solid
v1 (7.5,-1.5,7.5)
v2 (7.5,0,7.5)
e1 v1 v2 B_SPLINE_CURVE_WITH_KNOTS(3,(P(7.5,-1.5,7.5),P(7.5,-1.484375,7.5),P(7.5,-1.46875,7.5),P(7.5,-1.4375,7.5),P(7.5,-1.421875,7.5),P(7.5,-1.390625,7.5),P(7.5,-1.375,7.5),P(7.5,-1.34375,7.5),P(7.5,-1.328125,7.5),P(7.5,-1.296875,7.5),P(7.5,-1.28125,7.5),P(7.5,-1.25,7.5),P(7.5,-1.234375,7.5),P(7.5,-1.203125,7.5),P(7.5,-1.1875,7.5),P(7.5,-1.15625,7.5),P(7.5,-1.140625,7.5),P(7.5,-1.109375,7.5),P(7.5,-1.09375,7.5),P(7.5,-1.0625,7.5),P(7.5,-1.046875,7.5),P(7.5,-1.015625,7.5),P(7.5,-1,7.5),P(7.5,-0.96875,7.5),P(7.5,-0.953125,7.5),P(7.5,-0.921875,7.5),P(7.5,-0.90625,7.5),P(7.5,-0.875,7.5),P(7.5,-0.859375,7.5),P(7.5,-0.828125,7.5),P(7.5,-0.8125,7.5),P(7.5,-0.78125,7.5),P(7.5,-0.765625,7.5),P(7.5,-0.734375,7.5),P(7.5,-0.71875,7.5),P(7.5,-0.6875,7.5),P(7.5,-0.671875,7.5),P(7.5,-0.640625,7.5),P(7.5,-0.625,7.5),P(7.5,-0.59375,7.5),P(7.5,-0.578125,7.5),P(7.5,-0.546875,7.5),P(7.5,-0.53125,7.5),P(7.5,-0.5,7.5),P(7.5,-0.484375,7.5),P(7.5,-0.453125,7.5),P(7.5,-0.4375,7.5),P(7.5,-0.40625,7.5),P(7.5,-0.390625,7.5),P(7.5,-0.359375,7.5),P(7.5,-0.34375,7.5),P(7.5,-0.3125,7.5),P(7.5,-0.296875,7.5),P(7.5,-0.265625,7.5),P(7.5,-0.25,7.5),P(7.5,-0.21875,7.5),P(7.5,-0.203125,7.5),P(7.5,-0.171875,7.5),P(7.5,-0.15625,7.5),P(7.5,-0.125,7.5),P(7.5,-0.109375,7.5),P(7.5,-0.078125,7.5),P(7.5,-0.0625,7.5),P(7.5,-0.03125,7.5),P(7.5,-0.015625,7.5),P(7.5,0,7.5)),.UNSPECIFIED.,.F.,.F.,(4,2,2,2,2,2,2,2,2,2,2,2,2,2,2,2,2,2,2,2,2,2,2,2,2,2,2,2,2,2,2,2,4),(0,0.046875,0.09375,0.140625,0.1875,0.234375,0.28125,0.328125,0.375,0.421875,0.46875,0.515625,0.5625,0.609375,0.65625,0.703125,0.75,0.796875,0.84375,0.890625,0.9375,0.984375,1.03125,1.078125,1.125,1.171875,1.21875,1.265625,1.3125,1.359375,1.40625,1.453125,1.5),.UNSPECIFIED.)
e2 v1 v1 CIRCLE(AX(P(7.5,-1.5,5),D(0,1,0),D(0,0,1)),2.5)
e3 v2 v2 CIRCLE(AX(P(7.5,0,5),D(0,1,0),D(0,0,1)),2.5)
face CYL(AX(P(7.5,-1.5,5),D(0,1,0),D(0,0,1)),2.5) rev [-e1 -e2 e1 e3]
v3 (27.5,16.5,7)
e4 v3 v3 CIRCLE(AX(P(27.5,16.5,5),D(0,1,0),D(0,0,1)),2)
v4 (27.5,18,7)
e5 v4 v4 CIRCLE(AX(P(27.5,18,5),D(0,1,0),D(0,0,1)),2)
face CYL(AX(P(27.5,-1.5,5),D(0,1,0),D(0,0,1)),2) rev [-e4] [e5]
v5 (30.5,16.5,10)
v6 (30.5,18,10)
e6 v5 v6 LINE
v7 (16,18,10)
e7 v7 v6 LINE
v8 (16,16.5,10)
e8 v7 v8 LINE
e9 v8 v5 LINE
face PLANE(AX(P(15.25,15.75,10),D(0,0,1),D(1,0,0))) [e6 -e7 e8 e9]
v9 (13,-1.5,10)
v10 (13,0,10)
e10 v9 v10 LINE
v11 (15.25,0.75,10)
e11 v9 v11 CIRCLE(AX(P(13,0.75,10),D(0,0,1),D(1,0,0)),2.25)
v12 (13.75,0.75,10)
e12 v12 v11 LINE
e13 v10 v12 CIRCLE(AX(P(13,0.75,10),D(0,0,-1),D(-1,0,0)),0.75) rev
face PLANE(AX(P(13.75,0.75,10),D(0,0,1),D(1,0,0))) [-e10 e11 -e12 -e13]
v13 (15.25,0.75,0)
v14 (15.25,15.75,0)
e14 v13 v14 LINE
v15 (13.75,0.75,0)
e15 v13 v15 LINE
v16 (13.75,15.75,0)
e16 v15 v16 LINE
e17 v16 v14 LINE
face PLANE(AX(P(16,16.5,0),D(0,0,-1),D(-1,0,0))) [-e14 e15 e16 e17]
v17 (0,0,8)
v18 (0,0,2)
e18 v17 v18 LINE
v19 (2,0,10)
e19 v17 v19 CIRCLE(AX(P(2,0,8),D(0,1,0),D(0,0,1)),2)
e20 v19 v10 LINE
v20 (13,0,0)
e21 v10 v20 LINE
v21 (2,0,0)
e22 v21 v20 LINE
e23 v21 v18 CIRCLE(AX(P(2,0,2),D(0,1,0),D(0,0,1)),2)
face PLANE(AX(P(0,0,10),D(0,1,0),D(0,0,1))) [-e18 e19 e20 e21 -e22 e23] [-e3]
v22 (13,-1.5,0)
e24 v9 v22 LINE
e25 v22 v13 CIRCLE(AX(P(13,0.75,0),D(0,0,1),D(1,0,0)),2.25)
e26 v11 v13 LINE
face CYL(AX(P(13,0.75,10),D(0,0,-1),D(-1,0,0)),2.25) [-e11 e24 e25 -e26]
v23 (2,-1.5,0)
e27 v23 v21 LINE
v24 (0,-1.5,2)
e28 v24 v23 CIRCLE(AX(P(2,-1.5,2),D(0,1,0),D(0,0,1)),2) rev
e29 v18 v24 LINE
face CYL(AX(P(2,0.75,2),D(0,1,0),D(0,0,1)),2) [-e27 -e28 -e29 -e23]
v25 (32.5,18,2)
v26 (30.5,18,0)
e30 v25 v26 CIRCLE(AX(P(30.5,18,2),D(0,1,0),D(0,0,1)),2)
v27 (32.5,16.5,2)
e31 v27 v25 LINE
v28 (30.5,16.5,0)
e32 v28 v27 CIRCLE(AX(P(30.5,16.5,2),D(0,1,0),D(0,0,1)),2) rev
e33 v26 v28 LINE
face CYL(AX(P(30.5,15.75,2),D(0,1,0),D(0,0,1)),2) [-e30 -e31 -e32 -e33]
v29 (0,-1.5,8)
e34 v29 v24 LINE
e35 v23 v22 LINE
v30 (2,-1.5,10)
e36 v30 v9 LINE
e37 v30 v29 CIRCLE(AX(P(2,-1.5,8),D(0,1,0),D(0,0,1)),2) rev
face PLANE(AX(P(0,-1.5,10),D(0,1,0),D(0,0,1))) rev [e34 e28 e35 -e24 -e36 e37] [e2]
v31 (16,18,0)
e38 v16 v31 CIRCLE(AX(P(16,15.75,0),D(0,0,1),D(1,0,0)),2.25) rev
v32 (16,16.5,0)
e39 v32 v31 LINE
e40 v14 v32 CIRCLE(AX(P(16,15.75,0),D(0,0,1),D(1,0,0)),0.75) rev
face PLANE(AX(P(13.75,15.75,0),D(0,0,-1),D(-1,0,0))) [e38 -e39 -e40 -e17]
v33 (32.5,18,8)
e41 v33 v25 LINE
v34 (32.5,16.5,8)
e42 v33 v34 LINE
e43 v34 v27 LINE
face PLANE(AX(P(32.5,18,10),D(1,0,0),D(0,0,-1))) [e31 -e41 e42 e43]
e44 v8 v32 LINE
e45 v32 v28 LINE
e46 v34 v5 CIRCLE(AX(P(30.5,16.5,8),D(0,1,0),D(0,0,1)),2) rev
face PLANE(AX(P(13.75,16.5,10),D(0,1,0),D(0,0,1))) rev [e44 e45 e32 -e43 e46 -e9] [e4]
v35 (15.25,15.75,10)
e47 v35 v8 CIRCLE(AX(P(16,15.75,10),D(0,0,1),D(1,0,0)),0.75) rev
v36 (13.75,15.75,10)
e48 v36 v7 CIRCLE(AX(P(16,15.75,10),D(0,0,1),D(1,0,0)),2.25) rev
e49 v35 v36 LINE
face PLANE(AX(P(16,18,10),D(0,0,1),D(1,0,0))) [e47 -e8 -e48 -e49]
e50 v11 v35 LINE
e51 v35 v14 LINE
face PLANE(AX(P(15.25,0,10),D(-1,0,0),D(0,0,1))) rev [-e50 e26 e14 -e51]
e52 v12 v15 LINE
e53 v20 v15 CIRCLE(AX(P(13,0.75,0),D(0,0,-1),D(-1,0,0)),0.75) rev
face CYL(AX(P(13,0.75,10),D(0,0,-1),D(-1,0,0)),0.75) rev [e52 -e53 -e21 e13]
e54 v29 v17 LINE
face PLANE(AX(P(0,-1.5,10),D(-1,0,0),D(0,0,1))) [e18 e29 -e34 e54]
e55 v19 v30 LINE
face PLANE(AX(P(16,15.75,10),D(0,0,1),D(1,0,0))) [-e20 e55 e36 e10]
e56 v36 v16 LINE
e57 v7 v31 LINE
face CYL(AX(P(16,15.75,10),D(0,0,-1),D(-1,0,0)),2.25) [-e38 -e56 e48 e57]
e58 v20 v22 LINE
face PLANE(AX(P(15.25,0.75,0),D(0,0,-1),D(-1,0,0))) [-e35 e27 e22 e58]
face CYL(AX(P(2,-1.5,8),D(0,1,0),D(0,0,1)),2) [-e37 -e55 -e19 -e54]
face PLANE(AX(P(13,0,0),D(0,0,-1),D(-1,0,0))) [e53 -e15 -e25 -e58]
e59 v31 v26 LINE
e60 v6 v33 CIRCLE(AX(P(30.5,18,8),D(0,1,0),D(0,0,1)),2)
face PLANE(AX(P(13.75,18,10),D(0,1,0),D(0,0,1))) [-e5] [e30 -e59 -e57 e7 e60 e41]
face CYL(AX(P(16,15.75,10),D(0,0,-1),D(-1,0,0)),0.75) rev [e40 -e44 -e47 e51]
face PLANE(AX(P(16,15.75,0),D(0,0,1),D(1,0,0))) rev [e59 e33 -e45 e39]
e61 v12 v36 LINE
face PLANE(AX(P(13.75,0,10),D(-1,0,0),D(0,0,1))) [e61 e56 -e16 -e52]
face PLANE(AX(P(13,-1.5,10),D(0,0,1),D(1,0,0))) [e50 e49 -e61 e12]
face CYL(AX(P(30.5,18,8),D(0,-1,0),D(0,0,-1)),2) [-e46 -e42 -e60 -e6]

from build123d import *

# Parameters (mm, degrees)
BASE_FLANGE1_DEPTH = 10
SKETCH6_R          = 2.5
CUT_EXTRUDE1_DEPTH = 39.474017206
SKETCH7_R          = 2
CUT_EXTRUDE2_DEPTH = 40.198214245
FILLET1_R          = 2


# Sheet-metal steps are written as plain solids
with BuildPart() as part:
    # Sketch1 → Base-Flange1 (new body)
    with BuildSketch(Plane.XY):
        with BuildLine():
            Line((0, 0), (13, 0))
            ThreePointArc((13, 0), (13.530330086, 0.219669914), (13.75, 0.75))
            Line((13.75, 0.75), (13.75, 15.75))
            ThreePointArc((13.75, 15.75), (14.409009742, 17.340990258), (16, 18))
            Line((16, 18), (32.5, 18))
            Line((32.5, 18), (32.5, 16.5))
            Line((32.5, 16.5), (16, 16.5))
            ThreePointArc((16, 16.5), (15.469669914, 16.280330086), (15.25, 15.75))
            Line((15.25, 15.75), (15.25, 0.75))
            ThreePointArc((15.25, 0.75), (14.590990258, -0.840990258), (13, -1.5))
            Line((13, -1.5), (0, -1.5))
            Line((0, -1.5), (0, 0))
        make_face()
    extrude(amount=BASE_FLANGE1_DEPTH)

    # Sketch6 → Cut-Extrude1 (cut, through all)
    with BuildSketch(Plane(origin=(0, 0, 0), x_dir=(1, 0, 0), z_dir=(0, 1, 0))):
        with Locations(Location((7.5, -5, 0), (0, 0, 270))):
            Circle(SKETCH6_R)
    extrude(amount=-CUT_EXTRUDE1_DEPTH, mode=Mode.SUBTRACT)

    # Sketch7 → Cut-Extrude2 (cut, through all)
    with BuildSketch(Plane(origin=(0, 18, 0), x_dir=(1, 0, 0), z_dir=(0, 1, 0))):
        with Locations(Location((27.5, -5, 0), (0, 0, 270))):
            Circle(SKETCH7_R)
    extrude(amount=-CUT_EXTRUDE2_DEPTH, mode=Mode.SUBTRACT)

    # Fillet1
    fillet1_edges = [part.edges().sort_by_distance(p)[0] for p in [
        (0, -0.75, 0),
        (32.5, 17.25, 0),
        (0, -0.75, 10),
        (32.5, 17.25, 10),
    ]]
    fillet(fillet1_edges, radius=FILLET1_R)


solid = part.part
